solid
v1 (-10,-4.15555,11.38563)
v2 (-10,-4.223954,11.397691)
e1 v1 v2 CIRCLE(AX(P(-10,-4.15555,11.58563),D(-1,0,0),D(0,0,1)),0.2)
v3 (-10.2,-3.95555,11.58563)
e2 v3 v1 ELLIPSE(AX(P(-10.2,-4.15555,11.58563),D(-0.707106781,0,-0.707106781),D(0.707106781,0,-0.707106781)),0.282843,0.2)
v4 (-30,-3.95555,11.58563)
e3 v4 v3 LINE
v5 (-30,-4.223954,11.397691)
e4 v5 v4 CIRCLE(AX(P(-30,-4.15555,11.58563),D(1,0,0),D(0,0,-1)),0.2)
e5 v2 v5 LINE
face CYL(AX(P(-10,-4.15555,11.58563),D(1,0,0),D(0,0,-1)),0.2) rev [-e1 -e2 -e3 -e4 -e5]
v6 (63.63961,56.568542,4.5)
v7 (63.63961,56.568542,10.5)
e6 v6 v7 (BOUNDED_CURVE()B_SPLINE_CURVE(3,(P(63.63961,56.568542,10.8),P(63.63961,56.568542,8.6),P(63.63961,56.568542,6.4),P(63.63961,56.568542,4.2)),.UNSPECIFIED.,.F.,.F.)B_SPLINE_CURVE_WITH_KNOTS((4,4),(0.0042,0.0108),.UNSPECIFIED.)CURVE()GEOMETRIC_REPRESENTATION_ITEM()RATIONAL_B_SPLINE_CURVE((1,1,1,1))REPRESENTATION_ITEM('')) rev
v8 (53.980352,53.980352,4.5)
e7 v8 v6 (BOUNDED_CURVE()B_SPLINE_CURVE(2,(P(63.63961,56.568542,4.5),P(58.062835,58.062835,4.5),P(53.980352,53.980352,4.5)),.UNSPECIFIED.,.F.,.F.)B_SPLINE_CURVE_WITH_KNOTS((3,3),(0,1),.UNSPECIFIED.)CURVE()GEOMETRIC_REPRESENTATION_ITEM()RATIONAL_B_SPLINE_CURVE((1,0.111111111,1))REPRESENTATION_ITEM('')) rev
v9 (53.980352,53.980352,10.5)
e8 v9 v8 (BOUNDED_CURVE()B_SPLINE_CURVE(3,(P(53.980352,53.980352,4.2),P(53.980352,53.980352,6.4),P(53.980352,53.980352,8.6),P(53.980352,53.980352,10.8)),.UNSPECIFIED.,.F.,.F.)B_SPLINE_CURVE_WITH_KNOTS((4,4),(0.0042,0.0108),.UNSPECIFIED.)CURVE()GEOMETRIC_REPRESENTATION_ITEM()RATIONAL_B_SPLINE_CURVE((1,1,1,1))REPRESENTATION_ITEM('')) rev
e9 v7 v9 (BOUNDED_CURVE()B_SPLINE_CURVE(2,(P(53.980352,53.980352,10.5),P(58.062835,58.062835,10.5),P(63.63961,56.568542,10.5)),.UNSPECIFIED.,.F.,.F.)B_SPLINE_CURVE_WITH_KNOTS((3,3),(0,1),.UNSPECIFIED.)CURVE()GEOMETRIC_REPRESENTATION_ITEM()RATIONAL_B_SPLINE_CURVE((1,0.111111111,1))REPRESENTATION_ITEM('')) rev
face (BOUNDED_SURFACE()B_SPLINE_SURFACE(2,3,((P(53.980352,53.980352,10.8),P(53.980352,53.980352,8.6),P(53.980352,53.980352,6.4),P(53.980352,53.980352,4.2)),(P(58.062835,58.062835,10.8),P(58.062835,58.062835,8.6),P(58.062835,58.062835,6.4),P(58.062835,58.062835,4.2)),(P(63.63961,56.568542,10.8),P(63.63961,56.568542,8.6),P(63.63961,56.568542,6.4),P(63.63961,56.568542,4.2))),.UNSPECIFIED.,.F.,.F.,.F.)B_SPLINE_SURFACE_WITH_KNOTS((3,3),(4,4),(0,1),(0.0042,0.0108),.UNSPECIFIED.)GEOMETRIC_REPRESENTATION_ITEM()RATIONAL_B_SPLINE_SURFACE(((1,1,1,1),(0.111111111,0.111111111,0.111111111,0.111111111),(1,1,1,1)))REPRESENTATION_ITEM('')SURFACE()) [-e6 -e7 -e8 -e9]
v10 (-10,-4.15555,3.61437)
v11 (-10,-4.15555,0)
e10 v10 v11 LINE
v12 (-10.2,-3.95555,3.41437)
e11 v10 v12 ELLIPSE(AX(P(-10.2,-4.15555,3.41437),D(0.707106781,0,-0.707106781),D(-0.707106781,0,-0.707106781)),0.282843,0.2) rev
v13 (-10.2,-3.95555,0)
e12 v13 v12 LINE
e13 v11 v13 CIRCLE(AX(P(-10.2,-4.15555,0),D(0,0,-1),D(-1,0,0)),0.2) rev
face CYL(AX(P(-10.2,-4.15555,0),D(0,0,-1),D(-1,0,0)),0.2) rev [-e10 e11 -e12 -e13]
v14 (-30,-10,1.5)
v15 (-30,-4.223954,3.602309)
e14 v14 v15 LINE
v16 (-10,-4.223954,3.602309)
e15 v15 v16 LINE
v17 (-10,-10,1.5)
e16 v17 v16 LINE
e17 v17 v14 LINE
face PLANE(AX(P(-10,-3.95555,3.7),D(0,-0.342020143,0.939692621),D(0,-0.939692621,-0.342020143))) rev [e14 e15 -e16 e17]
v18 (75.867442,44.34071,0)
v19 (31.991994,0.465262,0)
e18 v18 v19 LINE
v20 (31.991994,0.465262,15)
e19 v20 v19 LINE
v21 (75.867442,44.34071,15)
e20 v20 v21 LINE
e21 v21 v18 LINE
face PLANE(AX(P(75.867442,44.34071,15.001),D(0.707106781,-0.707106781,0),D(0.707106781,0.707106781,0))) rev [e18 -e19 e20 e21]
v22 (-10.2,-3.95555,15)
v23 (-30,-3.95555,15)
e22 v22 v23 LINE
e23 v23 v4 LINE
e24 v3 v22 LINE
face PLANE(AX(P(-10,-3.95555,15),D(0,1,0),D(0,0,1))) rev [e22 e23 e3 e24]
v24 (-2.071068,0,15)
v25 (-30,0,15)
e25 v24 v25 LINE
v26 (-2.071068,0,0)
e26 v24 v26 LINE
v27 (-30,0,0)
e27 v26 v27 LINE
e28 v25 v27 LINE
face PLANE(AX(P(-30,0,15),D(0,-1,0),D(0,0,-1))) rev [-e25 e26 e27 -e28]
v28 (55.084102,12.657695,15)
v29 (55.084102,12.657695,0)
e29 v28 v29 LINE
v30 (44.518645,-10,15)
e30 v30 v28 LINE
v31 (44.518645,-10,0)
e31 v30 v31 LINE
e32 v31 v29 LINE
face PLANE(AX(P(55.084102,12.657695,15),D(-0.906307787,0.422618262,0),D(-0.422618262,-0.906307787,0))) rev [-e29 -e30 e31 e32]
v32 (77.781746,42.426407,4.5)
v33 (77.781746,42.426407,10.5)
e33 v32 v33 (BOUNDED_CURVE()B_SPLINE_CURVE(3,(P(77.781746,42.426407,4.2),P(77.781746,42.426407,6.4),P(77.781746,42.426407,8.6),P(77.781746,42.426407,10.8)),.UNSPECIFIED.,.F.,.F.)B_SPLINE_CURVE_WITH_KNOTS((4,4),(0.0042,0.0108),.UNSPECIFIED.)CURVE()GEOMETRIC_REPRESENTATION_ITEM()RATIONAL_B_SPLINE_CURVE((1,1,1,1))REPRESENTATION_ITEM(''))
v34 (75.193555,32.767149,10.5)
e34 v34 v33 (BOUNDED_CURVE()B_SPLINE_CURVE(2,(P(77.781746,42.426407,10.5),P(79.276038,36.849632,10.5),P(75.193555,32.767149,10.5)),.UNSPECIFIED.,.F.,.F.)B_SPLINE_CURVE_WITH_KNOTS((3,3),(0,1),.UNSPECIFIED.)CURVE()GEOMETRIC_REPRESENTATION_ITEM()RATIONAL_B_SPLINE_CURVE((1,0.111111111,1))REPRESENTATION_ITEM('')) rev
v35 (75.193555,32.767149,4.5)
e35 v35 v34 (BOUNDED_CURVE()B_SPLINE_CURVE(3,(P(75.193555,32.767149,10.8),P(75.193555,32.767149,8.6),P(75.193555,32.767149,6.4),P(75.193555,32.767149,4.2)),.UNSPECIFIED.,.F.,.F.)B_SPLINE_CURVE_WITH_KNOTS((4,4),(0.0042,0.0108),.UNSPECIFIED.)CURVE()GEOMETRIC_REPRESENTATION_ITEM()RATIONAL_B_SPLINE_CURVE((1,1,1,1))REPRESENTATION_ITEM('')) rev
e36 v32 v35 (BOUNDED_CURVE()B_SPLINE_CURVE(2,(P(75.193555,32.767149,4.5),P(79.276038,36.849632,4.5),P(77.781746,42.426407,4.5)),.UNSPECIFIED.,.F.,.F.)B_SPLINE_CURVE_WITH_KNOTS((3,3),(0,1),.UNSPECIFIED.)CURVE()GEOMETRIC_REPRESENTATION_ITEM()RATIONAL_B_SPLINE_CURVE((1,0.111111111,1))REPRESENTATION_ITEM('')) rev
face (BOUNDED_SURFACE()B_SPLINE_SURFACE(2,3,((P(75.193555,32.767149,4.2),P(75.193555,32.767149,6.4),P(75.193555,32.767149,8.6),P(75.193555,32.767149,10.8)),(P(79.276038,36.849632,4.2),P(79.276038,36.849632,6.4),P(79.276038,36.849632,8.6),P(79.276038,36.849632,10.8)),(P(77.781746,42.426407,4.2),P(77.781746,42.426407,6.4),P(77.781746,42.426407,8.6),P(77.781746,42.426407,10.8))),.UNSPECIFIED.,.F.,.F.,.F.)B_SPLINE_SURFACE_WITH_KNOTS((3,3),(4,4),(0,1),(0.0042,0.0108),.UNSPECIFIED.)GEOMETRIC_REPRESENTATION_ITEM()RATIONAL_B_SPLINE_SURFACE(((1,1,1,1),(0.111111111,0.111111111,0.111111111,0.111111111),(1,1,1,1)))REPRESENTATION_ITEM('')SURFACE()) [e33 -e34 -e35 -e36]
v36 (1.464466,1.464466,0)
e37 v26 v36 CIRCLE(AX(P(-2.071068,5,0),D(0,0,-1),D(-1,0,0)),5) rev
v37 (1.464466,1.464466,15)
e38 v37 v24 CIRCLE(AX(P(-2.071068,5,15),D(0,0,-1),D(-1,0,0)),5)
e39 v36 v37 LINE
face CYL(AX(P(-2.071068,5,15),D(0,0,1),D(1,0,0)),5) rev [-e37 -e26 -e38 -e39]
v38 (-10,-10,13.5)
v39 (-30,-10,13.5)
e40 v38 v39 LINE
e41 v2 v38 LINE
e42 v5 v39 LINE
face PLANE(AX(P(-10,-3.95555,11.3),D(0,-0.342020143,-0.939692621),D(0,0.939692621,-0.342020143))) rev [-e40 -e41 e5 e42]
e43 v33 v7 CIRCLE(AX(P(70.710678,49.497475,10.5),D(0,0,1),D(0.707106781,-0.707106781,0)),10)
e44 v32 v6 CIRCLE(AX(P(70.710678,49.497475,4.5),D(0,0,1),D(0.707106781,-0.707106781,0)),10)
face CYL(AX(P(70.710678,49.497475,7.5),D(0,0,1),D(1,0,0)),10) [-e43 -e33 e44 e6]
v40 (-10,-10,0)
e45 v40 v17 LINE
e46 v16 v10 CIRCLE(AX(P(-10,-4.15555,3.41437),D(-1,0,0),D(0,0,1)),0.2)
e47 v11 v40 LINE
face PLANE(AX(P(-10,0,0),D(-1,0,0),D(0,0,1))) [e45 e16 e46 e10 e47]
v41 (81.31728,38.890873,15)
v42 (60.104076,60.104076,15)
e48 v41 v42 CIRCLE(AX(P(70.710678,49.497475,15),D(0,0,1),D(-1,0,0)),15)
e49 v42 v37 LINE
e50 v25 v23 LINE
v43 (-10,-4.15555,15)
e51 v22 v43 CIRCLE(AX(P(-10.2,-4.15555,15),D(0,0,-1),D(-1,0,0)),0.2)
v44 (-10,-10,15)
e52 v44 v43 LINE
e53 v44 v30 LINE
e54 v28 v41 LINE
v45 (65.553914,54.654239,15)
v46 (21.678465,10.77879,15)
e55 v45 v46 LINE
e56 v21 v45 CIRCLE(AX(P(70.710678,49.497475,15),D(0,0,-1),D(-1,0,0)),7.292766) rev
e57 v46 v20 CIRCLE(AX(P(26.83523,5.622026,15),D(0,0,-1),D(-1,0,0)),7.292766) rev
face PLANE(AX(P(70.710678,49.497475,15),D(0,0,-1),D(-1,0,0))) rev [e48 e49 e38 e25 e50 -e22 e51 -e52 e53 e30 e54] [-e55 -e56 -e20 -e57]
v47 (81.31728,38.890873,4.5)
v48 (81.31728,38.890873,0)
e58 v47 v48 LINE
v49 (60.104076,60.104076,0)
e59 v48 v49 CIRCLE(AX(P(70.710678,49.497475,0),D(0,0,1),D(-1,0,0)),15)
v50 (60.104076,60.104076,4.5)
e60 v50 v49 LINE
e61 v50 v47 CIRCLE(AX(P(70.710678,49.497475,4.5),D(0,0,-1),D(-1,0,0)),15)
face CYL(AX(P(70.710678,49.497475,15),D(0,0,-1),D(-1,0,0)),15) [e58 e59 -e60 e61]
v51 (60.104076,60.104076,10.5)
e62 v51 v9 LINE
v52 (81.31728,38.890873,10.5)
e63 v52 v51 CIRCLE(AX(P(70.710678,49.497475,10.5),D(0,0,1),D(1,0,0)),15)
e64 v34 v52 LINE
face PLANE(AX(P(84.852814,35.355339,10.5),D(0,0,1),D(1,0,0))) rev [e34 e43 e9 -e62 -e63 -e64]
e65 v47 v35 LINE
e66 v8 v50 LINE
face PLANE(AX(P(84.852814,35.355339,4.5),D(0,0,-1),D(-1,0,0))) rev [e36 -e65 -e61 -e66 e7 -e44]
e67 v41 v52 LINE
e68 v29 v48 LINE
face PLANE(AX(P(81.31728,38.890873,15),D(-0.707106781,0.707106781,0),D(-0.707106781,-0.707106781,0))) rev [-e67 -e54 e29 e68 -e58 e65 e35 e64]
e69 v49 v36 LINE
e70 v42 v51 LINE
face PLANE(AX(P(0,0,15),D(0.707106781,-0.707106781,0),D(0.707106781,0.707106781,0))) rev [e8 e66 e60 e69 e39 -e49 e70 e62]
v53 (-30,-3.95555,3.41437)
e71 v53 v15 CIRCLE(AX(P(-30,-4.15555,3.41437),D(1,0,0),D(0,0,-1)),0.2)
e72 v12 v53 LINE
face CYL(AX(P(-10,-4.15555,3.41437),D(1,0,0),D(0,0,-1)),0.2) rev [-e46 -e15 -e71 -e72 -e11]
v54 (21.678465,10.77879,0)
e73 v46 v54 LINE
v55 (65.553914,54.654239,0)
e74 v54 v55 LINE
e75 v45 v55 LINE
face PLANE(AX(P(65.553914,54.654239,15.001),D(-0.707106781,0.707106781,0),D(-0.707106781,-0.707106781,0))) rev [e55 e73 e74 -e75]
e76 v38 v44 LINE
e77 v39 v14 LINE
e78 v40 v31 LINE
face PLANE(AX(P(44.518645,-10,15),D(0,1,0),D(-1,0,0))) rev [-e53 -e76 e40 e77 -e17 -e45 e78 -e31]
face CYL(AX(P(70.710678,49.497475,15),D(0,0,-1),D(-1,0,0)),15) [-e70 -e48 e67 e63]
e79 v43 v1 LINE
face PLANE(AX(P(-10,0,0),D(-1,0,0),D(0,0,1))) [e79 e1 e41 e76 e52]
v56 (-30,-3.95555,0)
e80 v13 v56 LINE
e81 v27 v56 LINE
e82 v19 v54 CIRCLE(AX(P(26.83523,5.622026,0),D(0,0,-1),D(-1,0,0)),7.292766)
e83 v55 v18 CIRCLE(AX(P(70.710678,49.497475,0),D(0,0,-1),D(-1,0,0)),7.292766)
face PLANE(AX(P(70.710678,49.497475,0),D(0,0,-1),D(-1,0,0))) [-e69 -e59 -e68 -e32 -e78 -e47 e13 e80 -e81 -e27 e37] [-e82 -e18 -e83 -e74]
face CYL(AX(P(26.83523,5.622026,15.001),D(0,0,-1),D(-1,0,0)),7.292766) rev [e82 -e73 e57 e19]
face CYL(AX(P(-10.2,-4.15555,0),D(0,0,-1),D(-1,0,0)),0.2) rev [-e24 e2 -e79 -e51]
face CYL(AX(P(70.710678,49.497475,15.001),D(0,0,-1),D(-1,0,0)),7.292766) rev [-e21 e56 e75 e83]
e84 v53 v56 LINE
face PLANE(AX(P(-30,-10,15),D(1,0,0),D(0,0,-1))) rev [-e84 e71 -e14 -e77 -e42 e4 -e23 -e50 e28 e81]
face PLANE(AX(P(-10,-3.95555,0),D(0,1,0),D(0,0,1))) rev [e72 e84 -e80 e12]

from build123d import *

# Parameters (mm, degrees)
BOSS_EXTRUDE1_DEPTH = 15
FILLET1_R           = 5
SKETCH4_W           = 6
SKETCH4_H           = 10
FILLET3_START       = 4.5
FILLET3_DEPTH       = 6
CUT_EXTRUDE1_REACH  = 110.311
CUT_EXTRUDE2_DEPTH  = 20
FILLET4_R           = 0.2


with BuildPart() as part:
    # Sketch1 → Boss-Extrude1 (new body)
    with BuildSketch(Plane.XY):
        with BuildLine():
            Line((0, 0), (60.104076401, 60.104076401))
            ThreePointArc((60.104076401, 60.104076401), (81.317279836, 60.104076401), (81.317279836, 38.890872965))
            Line((81.317279836, 38.890872965), (55.084101547, 12.657694676))
            Line((55.084101547, 12.657694676), (44.518645004, -10))
            Line((44.518645004, -10), (-30, -10))
            Line((-30, -10), (-30, 0))
            Line((-30, 0), (0, 0))
        make_face()
    extrude(amount=BOSS_EXTRUDE1_DEPTH)

    # Fillet1
    fillet1_edges = [part.edges().sort_by_distance(p)[0] for p in [
        (0, 0, 7.5),
    ]]
    fillet(fillet1_edges, radius=FILLET1_R)

    # Cut-Sweep1: sweep along a path in Sketch3
    with BuildLine(Plane.XY.offset(7.5)) as cut_sweep1_path:
        ThreePointArc((81.317279836, 38.890872965), (81.317279836, 60.104076401), (60.104076401, 60.104076401))
    # Sketch4 → Cut-Sweep1 (sweep, cut)
    with BuildSketch(Plane(origin=(60.104076401, 60.104076401, 0), x_dir=(0, 0, -1), z_dir=(-0.7071067811865462, -0.7071067811865489, 0))):
        with Locations((-7.5, 0)):
            Rectangle(SKETCH4_W, SKETCH4_H)
    sweep(path=cut_sweep1_path.line, mode=Mode.SUBTRACT)

    # Fillet3: read off the stored shape, not the designer's step
    # Fillet3 outline → Fillet3 (cut)
    with BuildSketch(Plane.XY.offset(FILLET3_START)):
        with BuildLine():
            add(Edge.make_bspline(
                [(75.193555479, 32.767148608), (79.276038384, 36.849631513), (77.781745931, 42.426406871)],
                knots=[0, 0, 0, 1, 1, 1], degree=2, weights=[1, 0.111111111, 1]))
            Line((75.193555479, 32.767148608), (81.317279836, 38.890872965))
            Line((81.317279836, 38.890872965), (77.781745931, 42.426406871))
        make_face()
        with BuildLine():
            Line((60.104076401, 60.104076401), (53.980352044, 53.980352044))
            add(Edge.make_bspline(
                [(53.980352044, 53.980352044), (58.062834949, 58.062834949), (63.639610307, 56.568542495)],
                knots=[0, 0, 0, 1, 1, 1], degree=2, weights=[1, 0.111111111, 1]))
            Line((63.639610307, 56.568542495), (60.104076401, 60.104076401))
        make_face()
    extrude(amount=FILLET3_DEPTH, mode=Mode.SUBTRACT)

    # Sketch5 → Cut-Extrude1 (cut, up to next)
    with BuildSketch(Plane(origin=(0, 0, 0), x_dir=(-1, 0, 0), z_dir=(0, 0, -1)), mode=Mode.PRIVATE) as cut_extrude1_sk1:
        with BuildLine():
            Line((-65.553913935, 54.654238867), (-21.67846541, 10.778790341))
            ThreePointArc((-21.67846541, 10.778790341), (-21.67846541, 0.465261974), (-31.991993777, 0.465261974))
            Line((-31.991993777, 0.465261974), (-75.867442302, 44.3407105))
            ThreePointArc((-75.867442302, 44.3407105), (-75.867442302, 54.654238867), (-65.553913935, 54.654238867))
        make_face()
    cut_extrude1_tool1 = extrude(cut_extrude1_sk1.sketch, amount=-CUT_EXTRUDE1_REACH, mode=Mode.PRIVATE) & part.part
    add(cut_extrude1_tool1.solids().sort_by_distance((48.772954, 27.55975, 0))[0], mode=Mode.SUBTRACT)

    # Sketch7 → Cut-Extrude2 (cut)
    with BuildSketch(Plane.ZY.offset(30)):
        Polygon((15, -3.955549677), (11.3, -3.955549677), (13.5, -10), (15, -10), align=None)
        Polygon((0, -10), (0, -3.955549677), (3.7, -3.955549677), (1.5, -10), align=None)
    extrude(amount=-CUT_EXTRUDE2_DEPTH, mode=Mode.SUBTRACT)

    # Fillet4
    fillet4_edges = [part.edges().sort_by_distance(p)[0] for p in [
        (-10, -3.955549677, 13.15),
        (-20, -3.955549677, 11.3),
        (-10, -3.955549677, 1.85),
        (-20, -3.955549677, 3.7),
    ]]
    fillet(fillet4_edges, radius=FILLET4_R)


solid = part.part
